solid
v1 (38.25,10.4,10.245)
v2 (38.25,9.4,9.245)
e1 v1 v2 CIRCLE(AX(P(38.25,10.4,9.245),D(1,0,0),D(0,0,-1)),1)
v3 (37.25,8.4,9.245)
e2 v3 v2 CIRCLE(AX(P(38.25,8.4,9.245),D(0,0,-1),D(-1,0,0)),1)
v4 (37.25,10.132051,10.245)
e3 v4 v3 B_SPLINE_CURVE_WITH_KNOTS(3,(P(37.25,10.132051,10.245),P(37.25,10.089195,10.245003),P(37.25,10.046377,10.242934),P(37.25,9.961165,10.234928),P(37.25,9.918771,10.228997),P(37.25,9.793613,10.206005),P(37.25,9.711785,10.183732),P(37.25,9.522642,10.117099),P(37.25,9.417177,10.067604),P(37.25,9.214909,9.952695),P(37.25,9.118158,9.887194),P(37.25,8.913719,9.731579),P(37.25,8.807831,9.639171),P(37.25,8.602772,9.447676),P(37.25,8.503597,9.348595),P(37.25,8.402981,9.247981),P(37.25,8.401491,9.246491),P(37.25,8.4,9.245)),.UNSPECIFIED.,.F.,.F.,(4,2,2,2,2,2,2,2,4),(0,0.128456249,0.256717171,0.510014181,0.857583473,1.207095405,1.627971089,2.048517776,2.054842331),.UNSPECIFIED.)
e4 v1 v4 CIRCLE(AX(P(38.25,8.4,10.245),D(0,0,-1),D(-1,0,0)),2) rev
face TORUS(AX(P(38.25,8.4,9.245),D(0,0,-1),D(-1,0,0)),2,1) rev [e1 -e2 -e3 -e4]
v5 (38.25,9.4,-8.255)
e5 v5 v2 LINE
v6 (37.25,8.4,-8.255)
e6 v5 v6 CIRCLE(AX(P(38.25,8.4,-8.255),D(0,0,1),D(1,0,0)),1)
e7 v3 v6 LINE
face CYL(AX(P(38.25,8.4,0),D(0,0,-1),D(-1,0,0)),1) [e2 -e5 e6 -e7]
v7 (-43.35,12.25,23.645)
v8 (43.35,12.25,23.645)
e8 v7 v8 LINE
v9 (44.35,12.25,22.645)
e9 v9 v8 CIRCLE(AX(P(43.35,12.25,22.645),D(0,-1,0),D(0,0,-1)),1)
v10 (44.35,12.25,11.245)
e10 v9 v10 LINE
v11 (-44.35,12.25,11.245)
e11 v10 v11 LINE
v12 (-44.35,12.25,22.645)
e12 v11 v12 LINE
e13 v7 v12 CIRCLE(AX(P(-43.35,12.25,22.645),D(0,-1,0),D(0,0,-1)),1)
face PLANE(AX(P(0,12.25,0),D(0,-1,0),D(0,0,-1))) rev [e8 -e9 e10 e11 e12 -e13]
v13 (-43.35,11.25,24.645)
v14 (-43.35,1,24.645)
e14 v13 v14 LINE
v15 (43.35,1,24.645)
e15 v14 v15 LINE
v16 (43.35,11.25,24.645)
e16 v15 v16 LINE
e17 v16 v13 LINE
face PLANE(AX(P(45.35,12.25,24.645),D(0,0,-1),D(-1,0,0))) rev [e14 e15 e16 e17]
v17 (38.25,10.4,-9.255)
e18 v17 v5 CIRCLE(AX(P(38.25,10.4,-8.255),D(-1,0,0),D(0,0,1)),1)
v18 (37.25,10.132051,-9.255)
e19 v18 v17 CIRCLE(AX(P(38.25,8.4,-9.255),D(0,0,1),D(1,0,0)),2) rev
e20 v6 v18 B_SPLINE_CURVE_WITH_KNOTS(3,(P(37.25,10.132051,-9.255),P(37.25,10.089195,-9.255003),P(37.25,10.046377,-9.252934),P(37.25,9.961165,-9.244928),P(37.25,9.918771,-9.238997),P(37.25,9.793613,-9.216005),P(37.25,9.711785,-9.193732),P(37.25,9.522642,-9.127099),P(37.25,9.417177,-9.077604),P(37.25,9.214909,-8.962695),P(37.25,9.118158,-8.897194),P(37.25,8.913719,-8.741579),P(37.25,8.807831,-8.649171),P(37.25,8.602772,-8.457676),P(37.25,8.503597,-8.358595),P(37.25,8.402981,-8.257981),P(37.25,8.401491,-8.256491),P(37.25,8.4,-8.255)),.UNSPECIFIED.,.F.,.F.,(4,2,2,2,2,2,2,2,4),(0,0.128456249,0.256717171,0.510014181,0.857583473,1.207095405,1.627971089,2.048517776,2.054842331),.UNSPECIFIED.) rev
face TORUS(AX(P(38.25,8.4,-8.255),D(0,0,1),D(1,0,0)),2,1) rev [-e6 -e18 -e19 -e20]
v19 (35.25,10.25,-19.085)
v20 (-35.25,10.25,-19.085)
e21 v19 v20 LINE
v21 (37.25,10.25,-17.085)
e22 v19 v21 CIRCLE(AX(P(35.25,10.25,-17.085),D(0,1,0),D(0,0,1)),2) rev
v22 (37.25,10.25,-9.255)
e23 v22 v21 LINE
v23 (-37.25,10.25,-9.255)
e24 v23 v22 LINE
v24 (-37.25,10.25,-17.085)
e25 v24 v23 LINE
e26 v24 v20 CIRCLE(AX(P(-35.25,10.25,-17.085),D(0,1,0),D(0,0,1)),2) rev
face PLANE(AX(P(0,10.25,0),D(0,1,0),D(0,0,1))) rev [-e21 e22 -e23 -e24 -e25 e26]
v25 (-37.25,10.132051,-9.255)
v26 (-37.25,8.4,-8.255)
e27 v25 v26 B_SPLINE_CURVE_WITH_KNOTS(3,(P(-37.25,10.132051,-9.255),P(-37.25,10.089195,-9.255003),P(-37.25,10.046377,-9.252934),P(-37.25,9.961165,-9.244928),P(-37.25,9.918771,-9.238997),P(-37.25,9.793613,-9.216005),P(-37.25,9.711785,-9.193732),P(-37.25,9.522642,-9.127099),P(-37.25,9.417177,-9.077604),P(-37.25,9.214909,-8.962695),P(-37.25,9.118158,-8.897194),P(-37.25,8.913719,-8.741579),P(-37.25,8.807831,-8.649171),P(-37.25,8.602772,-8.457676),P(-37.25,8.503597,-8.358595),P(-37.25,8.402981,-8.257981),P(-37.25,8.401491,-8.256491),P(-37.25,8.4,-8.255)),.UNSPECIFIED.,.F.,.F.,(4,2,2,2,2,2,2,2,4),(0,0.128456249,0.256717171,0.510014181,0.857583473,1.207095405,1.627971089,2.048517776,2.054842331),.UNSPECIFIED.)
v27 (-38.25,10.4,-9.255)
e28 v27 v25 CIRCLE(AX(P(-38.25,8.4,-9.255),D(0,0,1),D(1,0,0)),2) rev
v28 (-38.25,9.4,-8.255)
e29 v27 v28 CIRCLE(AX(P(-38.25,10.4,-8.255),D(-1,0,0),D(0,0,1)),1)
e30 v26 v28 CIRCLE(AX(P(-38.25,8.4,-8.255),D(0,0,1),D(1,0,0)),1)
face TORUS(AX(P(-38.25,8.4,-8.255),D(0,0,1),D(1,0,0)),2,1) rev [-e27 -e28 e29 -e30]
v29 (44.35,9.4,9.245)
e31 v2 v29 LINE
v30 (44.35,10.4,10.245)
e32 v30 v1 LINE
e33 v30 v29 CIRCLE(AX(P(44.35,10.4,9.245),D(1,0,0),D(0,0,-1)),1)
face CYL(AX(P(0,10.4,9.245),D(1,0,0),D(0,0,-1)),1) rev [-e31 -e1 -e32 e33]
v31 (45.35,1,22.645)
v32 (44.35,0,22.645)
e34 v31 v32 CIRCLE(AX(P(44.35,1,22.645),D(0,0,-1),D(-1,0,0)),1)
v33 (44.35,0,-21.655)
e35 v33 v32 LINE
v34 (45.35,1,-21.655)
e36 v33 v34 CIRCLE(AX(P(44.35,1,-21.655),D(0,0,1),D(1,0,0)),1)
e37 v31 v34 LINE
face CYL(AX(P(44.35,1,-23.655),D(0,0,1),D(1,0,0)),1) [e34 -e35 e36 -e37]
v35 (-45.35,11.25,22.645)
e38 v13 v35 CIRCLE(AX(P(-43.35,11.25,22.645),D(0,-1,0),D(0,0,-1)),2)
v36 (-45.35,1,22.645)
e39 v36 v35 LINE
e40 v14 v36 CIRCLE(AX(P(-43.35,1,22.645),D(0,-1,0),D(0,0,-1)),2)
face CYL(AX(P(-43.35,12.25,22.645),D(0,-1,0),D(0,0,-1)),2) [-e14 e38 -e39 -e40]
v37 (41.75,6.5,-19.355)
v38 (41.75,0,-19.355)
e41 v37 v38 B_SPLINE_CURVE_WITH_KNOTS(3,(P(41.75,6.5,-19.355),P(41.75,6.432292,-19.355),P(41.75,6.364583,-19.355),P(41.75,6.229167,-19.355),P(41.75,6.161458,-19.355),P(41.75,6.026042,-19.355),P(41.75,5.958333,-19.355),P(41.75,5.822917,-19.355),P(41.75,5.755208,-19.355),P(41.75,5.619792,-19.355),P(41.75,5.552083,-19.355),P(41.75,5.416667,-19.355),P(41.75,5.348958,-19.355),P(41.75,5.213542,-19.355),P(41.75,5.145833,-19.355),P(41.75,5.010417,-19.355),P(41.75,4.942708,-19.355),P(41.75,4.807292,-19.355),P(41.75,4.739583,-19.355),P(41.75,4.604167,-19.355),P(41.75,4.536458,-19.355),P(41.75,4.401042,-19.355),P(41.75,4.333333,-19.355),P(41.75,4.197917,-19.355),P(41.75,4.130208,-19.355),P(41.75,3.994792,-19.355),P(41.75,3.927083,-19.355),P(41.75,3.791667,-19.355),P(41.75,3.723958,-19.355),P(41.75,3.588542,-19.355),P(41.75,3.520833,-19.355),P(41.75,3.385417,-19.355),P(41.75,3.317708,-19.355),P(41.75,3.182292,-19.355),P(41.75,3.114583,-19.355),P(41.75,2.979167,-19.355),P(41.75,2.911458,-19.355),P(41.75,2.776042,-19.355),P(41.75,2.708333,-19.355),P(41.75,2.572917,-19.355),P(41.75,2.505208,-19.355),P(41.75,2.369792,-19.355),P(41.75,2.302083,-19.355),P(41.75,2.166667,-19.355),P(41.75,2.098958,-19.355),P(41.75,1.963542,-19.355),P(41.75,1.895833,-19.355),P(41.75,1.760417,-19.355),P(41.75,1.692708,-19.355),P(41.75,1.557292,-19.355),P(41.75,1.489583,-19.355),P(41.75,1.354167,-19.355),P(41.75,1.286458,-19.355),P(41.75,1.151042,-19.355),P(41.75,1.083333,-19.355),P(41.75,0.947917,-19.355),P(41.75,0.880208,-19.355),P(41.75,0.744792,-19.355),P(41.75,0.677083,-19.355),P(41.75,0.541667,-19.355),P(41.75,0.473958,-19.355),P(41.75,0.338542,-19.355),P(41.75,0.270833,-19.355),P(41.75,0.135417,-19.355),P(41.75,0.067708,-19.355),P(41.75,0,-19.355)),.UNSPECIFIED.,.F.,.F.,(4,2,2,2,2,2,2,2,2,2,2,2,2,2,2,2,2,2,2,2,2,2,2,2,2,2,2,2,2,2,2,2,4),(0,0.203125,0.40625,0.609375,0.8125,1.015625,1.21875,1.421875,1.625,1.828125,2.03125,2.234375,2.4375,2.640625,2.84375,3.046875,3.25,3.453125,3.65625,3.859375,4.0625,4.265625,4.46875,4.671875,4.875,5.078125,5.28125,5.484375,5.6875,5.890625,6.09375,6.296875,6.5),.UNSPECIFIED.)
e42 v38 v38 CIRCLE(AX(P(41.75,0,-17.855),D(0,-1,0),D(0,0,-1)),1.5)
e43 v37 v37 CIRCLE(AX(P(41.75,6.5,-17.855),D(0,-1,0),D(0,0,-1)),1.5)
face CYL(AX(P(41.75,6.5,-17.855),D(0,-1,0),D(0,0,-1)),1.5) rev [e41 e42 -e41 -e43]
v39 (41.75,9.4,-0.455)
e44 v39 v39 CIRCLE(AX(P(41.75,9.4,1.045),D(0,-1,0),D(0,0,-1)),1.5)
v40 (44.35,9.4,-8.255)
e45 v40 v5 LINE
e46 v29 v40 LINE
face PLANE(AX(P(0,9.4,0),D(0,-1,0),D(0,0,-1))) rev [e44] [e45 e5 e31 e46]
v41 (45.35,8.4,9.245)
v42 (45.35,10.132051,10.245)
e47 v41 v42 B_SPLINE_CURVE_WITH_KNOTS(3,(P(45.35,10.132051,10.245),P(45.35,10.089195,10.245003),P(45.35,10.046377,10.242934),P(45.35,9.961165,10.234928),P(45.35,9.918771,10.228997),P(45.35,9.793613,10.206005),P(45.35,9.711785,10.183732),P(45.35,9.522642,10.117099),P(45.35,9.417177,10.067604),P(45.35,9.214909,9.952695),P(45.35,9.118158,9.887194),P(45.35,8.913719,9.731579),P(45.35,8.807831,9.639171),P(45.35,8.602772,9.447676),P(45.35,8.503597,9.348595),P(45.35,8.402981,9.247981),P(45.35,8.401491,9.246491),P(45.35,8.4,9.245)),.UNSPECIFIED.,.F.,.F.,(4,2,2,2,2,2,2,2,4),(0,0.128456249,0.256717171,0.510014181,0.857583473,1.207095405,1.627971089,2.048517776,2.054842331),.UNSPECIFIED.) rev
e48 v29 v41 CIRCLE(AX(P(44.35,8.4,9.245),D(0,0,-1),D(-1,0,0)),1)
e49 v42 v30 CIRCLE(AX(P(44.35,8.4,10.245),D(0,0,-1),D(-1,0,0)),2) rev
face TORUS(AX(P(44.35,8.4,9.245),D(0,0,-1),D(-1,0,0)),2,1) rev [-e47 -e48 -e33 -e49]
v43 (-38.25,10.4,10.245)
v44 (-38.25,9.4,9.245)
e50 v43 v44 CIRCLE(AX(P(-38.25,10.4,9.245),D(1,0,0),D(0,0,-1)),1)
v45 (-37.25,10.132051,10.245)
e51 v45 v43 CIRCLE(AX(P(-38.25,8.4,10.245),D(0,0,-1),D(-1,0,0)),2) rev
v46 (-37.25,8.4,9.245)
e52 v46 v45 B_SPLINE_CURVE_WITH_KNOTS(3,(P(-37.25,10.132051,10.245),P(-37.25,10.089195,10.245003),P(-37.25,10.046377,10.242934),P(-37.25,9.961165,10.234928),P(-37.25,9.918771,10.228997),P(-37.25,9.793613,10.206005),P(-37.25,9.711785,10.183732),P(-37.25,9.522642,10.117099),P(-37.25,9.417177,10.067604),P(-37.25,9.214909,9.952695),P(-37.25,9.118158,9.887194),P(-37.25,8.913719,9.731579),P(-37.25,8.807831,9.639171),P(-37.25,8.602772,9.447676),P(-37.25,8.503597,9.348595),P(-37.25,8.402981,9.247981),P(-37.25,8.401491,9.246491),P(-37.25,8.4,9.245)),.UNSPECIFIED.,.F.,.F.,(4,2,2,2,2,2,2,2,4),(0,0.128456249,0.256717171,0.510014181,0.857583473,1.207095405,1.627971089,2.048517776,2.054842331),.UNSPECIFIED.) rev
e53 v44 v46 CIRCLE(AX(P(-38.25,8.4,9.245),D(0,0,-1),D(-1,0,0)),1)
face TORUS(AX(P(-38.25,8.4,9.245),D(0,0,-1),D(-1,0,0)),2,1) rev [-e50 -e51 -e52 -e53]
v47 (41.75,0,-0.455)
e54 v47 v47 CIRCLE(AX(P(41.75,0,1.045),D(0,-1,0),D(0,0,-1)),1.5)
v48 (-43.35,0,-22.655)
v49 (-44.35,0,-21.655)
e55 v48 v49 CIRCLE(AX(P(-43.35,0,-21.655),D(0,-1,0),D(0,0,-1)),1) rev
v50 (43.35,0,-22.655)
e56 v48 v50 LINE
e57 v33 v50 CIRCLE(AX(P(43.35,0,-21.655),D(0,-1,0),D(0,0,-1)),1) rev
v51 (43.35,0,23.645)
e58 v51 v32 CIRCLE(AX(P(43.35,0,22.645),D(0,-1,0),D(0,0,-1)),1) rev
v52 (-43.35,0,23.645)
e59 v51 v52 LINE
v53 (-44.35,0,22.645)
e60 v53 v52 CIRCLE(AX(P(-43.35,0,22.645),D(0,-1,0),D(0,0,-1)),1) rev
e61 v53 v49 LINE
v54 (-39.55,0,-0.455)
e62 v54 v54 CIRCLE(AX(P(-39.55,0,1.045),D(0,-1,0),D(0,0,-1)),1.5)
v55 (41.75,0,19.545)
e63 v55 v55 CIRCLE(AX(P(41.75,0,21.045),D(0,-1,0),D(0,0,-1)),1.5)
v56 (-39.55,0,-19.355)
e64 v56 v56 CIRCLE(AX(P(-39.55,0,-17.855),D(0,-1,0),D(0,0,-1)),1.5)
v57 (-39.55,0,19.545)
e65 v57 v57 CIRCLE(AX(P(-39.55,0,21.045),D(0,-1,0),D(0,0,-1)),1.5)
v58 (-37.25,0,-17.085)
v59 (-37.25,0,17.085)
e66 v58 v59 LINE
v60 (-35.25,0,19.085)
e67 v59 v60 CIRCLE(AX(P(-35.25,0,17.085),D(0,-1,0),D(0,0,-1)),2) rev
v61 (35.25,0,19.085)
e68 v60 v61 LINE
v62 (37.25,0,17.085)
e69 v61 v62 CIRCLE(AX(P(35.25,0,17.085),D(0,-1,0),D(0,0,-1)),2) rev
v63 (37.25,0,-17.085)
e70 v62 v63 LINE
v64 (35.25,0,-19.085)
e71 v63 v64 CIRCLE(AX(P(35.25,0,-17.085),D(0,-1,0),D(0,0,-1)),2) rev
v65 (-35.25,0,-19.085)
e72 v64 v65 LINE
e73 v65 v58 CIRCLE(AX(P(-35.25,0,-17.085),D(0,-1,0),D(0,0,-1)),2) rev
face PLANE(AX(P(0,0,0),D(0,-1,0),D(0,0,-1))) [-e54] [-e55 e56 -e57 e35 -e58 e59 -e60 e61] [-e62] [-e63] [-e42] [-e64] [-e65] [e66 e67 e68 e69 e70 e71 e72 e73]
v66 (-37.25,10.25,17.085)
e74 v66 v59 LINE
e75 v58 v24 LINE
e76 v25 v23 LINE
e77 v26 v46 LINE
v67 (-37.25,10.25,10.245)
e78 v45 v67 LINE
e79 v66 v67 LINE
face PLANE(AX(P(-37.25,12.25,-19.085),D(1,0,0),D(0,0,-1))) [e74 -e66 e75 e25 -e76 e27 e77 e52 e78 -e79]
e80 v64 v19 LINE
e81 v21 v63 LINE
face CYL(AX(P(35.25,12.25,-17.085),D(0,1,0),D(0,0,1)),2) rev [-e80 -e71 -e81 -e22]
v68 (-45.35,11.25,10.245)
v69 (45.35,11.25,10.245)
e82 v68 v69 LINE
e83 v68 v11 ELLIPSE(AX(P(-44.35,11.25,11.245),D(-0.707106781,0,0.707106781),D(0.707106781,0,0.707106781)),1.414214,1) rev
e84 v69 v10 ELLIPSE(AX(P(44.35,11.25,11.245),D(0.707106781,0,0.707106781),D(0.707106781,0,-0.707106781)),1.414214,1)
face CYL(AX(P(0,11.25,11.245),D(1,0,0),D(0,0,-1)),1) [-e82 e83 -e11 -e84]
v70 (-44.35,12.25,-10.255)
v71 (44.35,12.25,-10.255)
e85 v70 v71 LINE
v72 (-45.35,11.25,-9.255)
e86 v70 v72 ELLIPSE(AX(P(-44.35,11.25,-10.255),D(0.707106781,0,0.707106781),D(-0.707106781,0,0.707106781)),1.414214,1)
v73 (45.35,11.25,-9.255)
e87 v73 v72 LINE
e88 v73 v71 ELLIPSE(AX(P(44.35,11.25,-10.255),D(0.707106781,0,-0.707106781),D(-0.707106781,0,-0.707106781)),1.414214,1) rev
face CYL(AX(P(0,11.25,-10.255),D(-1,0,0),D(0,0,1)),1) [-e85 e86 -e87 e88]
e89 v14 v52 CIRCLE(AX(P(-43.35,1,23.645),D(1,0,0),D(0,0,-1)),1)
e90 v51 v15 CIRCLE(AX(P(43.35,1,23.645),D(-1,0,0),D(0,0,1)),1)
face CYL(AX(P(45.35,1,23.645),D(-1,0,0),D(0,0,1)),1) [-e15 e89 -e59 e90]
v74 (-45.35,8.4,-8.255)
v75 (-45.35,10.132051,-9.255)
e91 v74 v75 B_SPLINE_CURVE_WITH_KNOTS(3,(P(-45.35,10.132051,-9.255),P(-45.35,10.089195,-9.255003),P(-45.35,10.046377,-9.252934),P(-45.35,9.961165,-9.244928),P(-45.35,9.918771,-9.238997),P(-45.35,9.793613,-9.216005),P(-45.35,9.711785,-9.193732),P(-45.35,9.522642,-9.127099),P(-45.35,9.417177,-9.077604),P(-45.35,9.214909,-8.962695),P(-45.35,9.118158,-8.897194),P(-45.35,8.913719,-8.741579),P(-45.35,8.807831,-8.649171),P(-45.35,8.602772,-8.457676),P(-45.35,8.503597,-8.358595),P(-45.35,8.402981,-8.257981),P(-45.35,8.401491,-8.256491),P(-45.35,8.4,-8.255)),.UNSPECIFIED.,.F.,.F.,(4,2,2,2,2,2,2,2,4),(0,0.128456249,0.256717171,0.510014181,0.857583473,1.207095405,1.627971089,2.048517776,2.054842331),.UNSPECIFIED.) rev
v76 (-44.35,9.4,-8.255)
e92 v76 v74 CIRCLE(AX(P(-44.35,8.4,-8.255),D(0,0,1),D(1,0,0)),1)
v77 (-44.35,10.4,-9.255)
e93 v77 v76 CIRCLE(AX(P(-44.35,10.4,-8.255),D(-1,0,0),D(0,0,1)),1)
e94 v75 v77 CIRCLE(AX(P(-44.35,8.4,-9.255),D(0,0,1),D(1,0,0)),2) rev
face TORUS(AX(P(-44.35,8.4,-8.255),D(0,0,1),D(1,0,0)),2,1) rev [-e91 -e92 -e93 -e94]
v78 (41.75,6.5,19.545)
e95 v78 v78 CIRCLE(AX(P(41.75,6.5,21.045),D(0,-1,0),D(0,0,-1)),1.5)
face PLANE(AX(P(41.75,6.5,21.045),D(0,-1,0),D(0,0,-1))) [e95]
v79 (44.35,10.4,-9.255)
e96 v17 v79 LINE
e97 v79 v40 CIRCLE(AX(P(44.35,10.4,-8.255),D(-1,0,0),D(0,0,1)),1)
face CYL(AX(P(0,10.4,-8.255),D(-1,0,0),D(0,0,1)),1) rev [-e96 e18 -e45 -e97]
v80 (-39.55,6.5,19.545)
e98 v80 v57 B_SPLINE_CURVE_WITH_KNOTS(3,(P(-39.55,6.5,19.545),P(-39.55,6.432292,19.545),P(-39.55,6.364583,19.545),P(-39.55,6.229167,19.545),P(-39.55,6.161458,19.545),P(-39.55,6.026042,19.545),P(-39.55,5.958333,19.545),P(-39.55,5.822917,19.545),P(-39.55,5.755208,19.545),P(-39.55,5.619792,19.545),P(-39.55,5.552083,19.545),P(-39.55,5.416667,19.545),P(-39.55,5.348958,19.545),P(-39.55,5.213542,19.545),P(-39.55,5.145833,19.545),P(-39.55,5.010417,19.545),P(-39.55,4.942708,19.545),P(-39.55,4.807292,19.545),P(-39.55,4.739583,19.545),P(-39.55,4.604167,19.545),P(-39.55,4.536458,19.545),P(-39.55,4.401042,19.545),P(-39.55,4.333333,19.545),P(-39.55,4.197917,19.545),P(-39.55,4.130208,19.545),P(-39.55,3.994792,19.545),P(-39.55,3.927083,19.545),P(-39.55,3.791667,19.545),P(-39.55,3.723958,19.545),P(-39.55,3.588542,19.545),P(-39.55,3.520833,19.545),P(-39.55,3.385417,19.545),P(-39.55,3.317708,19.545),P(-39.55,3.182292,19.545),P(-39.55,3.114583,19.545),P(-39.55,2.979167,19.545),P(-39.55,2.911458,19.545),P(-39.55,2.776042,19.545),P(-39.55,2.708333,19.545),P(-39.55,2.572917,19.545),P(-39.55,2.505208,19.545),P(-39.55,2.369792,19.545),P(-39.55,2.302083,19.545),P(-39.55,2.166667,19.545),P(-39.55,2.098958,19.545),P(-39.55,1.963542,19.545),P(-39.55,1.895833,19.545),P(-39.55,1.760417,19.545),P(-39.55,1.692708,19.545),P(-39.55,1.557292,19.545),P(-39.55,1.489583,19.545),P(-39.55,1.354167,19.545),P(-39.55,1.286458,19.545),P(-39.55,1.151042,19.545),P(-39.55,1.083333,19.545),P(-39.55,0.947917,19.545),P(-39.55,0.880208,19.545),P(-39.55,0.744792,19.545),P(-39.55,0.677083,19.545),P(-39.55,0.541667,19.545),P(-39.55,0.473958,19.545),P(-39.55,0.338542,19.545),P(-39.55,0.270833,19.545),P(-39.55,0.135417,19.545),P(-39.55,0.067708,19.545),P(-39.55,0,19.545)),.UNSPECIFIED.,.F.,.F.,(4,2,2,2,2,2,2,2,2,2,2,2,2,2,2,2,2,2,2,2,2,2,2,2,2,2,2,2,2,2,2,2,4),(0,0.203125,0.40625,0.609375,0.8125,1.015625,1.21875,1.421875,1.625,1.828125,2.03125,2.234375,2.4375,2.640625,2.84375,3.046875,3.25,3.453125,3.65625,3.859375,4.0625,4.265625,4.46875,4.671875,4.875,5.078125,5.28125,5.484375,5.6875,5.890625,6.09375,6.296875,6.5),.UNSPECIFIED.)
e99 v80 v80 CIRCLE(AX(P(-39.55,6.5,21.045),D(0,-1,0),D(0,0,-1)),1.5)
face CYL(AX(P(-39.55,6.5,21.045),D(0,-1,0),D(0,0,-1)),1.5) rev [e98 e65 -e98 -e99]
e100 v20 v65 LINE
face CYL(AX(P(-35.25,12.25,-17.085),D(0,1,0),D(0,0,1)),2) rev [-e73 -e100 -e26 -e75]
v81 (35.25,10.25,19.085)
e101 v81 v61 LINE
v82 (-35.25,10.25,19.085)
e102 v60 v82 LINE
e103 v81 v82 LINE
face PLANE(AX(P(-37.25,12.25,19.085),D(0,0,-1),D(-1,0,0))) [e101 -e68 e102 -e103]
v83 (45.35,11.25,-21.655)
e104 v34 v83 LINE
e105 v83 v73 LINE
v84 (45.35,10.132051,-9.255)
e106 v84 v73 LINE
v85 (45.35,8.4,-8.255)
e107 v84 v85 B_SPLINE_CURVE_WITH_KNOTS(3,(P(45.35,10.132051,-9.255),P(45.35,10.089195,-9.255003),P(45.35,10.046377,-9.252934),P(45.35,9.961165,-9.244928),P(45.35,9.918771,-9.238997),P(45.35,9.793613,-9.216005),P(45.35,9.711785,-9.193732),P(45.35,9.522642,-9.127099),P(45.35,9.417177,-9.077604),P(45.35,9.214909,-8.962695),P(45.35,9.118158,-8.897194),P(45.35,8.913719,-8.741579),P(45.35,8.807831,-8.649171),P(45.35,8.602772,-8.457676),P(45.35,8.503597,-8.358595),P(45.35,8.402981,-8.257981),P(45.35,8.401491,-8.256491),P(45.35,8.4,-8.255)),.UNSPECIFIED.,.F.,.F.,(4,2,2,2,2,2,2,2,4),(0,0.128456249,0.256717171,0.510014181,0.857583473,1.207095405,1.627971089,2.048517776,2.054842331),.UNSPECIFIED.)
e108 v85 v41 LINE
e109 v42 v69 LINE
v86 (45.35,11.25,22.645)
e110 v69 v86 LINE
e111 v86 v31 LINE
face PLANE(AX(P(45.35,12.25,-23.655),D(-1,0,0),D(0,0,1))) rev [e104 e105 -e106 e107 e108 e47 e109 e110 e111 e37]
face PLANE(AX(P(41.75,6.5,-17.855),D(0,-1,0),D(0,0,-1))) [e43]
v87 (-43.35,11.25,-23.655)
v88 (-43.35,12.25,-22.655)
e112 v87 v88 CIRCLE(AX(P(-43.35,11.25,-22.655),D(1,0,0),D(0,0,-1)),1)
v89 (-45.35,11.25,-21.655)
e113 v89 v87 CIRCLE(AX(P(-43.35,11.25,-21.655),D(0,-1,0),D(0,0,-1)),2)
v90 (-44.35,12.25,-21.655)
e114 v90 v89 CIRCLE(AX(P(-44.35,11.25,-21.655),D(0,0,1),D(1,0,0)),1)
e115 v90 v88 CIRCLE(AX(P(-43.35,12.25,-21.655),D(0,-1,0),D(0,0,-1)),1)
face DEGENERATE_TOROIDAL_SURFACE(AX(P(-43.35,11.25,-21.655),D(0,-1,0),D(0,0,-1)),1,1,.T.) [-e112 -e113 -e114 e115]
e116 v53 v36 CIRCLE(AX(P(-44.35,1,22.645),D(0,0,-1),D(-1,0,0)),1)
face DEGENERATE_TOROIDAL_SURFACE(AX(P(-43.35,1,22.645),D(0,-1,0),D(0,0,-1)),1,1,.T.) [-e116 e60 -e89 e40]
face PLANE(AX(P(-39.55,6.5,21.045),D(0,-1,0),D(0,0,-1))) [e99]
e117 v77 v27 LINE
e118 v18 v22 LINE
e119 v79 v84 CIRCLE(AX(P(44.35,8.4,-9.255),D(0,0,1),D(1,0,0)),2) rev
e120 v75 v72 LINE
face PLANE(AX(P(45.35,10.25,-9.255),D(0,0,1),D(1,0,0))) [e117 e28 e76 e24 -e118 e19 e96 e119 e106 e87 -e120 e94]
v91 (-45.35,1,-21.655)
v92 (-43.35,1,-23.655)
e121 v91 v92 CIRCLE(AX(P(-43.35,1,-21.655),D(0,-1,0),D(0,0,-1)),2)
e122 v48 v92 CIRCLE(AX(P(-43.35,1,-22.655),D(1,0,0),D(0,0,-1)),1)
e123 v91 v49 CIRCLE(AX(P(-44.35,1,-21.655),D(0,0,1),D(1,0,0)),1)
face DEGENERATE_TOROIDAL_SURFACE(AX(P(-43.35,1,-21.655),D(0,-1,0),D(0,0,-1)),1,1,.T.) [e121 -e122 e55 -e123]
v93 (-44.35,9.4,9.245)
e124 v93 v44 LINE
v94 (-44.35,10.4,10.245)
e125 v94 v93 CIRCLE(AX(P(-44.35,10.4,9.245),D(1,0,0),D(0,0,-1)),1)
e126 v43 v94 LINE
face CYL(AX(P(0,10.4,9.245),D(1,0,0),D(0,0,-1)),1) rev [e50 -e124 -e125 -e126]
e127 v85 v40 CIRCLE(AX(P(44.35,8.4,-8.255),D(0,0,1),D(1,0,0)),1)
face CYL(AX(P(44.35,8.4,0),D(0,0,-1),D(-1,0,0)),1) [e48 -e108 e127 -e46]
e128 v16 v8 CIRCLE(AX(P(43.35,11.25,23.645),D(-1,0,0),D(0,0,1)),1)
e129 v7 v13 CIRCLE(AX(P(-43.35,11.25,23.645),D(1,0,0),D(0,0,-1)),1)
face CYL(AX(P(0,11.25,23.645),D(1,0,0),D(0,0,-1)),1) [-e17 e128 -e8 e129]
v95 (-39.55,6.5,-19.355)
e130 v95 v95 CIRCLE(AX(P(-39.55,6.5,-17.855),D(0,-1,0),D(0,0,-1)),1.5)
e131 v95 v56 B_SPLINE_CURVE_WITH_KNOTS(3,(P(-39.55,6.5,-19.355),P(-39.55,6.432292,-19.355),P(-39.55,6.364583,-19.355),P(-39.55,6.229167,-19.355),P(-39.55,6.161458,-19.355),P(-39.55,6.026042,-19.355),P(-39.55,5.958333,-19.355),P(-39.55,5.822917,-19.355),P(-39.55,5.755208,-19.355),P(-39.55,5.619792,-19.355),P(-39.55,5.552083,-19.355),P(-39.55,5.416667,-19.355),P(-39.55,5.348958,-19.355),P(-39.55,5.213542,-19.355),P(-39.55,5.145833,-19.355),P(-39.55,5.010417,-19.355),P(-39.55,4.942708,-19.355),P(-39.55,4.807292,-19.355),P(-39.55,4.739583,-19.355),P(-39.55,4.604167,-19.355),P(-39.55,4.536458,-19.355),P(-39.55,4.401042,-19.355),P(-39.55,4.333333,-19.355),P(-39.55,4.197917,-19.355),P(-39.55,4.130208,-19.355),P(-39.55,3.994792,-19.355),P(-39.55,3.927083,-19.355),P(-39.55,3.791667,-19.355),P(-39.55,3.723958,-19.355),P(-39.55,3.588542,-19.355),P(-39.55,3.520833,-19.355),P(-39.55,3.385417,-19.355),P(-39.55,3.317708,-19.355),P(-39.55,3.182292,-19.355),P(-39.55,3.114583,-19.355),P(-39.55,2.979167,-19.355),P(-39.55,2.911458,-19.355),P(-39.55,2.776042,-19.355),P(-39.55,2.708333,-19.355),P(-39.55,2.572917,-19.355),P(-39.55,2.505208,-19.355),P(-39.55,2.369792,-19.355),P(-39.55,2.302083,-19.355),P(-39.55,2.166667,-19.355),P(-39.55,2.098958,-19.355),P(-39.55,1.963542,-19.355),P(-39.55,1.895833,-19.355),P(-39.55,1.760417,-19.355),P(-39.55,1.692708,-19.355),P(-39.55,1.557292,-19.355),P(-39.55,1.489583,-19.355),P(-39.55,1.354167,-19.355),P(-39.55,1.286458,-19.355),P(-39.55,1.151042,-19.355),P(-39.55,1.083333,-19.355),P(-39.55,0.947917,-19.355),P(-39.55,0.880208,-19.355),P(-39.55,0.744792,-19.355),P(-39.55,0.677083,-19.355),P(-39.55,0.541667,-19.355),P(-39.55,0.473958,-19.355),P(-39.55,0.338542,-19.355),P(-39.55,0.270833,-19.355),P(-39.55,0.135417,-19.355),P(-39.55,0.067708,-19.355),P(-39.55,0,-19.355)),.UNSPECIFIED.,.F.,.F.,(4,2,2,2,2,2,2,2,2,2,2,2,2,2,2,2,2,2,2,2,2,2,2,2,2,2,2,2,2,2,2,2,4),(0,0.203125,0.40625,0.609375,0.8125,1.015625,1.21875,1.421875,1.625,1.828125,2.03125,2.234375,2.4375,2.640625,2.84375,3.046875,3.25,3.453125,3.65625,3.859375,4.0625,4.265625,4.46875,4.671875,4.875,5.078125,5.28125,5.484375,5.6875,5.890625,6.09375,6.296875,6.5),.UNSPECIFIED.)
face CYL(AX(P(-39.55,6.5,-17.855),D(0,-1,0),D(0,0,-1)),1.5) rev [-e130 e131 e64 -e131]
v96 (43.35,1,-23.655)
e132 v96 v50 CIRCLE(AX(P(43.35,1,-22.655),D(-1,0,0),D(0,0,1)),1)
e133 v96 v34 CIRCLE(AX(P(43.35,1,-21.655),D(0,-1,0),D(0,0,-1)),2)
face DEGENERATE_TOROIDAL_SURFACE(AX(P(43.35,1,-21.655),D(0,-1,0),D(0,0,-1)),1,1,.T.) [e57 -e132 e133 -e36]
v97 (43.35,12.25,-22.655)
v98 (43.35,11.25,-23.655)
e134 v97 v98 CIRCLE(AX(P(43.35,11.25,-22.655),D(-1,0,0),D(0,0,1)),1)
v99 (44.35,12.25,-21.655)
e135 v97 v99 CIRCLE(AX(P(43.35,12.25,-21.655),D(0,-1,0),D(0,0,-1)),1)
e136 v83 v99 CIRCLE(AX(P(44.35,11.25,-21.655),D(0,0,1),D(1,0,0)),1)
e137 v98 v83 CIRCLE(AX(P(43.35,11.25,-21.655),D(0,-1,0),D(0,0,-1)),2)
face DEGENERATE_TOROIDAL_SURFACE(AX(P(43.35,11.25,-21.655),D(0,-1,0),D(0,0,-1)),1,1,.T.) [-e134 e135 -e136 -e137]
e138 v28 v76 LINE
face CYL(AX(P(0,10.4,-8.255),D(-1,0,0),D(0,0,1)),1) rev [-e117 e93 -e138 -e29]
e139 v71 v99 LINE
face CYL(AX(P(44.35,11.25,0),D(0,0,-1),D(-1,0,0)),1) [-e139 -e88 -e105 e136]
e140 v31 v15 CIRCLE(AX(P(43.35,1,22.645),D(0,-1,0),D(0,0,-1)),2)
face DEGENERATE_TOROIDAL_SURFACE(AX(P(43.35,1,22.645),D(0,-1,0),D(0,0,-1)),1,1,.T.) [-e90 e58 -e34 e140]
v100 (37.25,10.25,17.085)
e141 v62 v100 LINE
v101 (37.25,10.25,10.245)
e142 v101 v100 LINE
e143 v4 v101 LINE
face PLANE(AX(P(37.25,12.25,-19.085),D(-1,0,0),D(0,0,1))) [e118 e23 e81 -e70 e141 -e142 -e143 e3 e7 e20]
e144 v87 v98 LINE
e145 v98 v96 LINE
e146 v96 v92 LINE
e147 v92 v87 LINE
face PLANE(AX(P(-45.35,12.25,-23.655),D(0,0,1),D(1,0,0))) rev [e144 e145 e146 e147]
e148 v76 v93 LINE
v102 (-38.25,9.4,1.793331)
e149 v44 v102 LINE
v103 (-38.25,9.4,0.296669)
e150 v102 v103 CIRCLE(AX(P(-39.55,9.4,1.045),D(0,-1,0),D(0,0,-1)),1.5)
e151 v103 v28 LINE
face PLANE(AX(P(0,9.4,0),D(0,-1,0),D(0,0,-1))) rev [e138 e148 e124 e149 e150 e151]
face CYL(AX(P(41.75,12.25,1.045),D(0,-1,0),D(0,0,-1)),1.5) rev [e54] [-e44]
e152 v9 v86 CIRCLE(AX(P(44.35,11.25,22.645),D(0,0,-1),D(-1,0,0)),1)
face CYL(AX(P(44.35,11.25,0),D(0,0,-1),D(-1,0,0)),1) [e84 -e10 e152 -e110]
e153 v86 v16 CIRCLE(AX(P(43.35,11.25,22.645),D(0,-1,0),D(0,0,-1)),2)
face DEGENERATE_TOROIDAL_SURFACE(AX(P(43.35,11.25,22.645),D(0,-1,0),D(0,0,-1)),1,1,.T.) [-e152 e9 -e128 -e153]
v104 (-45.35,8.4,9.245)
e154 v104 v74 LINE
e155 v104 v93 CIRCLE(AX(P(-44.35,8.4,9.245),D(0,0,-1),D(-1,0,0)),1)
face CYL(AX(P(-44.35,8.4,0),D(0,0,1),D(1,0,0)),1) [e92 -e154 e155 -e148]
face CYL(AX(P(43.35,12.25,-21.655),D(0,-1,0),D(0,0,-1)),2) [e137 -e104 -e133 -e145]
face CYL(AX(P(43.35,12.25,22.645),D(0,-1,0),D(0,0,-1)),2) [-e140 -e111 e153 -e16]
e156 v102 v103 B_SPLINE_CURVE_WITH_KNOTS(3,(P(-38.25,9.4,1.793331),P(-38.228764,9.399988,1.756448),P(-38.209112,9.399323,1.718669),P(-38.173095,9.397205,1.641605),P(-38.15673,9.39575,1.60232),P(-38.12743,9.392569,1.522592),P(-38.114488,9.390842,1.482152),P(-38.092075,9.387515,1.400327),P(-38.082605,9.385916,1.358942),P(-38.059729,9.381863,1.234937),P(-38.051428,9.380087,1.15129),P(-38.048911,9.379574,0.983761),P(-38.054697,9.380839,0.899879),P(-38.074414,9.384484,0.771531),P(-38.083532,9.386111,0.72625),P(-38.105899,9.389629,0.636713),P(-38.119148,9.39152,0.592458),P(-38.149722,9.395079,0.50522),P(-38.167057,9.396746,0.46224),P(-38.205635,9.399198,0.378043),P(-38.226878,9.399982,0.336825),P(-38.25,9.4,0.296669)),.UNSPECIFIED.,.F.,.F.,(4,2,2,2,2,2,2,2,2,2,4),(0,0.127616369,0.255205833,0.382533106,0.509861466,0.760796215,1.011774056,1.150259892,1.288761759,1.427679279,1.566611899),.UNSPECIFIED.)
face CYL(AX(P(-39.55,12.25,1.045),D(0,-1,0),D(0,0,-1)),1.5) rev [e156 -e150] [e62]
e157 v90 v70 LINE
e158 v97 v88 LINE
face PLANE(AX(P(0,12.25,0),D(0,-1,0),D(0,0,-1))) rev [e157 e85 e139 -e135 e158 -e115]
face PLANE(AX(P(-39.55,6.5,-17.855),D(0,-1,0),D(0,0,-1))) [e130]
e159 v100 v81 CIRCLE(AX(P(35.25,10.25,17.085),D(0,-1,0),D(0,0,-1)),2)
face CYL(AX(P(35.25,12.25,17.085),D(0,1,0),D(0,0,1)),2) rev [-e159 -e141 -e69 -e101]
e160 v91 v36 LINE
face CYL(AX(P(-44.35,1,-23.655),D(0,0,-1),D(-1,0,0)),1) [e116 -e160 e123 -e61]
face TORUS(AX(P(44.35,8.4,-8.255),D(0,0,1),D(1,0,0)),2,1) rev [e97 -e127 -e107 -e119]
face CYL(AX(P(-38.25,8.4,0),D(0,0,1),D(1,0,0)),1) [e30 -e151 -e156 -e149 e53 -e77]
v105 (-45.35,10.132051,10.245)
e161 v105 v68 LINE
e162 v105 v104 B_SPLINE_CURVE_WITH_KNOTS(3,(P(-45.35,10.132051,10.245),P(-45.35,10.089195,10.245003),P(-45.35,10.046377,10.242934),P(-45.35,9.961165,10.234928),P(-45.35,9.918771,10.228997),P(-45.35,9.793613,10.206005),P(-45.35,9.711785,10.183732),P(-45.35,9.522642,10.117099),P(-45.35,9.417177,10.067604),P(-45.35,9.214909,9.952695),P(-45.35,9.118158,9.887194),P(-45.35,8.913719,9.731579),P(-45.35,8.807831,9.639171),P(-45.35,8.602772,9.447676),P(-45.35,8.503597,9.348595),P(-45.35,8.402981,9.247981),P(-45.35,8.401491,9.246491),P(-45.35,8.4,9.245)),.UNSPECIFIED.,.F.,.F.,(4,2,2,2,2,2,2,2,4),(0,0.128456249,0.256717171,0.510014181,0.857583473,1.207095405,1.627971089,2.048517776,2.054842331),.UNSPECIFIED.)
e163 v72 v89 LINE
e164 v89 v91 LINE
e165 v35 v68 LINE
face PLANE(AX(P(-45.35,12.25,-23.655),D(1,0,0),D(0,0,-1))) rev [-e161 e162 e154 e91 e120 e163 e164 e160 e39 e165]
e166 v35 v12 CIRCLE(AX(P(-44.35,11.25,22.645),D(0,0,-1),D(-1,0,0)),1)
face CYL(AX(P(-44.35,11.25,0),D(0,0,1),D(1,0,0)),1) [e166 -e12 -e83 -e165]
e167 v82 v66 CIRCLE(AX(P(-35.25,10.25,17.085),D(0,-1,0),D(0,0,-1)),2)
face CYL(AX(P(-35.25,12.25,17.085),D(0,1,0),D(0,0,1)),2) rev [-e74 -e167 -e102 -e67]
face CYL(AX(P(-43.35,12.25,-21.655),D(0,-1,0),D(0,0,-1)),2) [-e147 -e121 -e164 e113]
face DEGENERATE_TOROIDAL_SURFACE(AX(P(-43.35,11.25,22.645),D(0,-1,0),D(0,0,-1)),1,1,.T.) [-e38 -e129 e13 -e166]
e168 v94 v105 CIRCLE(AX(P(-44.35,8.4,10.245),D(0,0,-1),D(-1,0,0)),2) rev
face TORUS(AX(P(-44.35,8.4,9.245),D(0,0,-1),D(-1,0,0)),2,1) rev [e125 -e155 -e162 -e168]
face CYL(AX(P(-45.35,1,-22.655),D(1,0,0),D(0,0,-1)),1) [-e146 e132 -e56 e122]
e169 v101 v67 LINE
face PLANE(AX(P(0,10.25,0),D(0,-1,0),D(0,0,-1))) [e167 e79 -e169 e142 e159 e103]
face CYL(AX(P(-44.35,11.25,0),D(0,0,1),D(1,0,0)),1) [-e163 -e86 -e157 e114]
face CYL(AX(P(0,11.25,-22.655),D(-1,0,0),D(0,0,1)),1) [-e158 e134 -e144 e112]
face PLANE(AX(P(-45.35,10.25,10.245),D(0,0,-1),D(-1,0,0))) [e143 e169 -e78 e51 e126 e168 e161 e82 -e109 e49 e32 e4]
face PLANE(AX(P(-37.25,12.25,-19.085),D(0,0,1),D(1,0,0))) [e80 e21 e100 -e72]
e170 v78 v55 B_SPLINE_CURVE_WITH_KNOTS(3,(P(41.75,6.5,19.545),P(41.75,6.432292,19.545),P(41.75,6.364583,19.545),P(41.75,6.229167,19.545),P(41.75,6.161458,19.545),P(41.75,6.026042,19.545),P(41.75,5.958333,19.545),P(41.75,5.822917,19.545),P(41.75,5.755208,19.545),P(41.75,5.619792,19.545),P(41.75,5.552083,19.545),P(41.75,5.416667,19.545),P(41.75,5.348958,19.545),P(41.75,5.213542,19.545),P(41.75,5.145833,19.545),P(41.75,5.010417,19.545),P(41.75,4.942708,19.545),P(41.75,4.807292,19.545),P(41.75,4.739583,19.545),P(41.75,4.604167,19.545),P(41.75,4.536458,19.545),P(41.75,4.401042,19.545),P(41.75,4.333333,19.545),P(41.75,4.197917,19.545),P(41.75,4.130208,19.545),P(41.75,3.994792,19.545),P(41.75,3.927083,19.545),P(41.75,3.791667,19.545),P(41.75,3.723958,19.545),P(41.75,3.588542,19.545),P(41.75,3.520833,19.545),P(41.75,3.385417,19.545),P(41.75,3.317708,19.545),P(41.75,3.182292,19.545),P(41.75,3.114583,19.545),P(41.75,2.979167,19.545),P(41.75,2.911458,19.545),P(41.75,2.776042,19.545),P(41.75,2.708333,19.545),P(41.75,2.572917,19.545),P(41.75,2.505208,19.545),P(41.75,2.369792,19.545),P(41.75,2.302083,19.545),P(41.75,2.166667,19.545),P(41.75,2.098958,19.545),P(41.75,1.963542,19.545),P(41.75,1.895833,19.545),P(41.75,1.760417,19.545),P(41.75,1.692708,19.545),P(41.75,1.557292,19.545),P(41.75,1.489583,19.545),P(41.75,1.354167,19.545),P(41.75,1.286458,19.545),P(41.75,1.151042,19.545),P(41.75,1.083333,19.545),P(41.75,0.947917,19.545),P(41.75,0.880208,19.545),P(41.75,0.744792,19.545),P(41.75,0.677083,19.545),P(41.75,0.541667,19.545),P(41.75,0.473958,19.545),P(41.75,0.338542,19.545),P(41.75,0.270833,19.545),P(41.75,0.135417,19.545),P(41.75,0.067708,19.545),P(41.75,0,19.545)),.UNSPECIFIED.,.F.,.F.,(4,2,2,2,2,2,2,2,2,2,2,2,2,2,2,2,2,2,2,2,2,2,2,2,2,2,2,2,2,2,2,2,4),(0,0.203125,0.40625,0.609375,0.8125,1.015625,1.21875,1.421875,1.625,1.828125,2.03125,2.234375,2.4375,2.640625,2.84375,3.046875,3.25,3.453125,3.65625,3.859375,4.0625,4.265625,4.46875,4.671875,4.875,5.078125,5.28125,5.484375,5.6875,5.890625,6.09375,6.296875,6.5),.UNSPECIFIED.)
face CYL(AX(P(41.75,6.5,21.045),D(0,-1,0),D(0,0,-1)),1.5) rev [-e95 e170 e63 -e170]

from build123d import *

# Parameters (mm, degrees)
SKETCH1_W           = 90.7
SKETCH1_H           = 48.3
SKETCH1_W_2         = 74.5
SKETCH1_H_2         = 38.17
BOSS_EXTRUDE1_DEPTH = 12.25
SKETCH2_W           = 90.7
SKETCH2_H           = 14.4
BOSS_EXTRUDE2_DEPTH = 2
SKETCH3_W           = 8.1
SKETCH3_H           = 19.5
CUT_EXTRUDE1_DEPTH  = 2.85
SKETCH4_R           = 1.5
CUT_EXTRUDE2_DEPTH  = 6.5
SKETCH5_R           = 1.5
CUT_EXTRUDE3_DEPTH  = 54.047724032
FILLET7_R           = 1
FILLET4_R           = 2
FILLET5_R           = 1
FILLET8_R           = 1


with BuildPart() as part:
    # Sketch1 → Boss-Extrude1 (new body)
    with BuildSketch(Plane(origin=(0, 0, 0), x_dir=(1, 0, 0), z_dir=(0, 1, 0))):
        with Locations((0, -0.495)):
            Rectangle(SKETCH1_W, SKETCH1_H)
        Rectangle(SKETCH1_W_2, SKETCH1_H_2, mode=Mode.SUBTRACT)
    extrude(amount=BOSS_EXTRUDE1_DEPTH)

    # Sketch2 → Boss-Extrude2 (add)
    with BuildSketch(Plane(origin=(0, 12.25, 0), x_dir=(1, 0, 0), z_dir=(0, 1, 0))):
        with Locations((0, 16.455)):
            Rectangle(SKETCH2_W, SKETCH2_H)
        with Locations((0, -17.445)):
            Rectangle(SKETCH2_W, SKETCH2_H)
    extrude(amount=-BOSS_EXTRUDE2_DEPTH)

    # Sketch3 → Cut-Extrude1 (cut)
    with BuildSketch(Plane(origin=(0, 12.25, 0), x_dir=(1, 0, 0), z_dir=(0, 1, 0))):
        with Locations((-41.3, -0.495)):
            Rectangle(SKETCH3_W, SKETCH3_H)
        with Locations((41.3, -0.495)):
            Rectangle(SKETCH3_W, SKETCH3_H)
    extrude(amount=-CUT_EXTRUDE1_DEPTH, mode=Mode.SUBTRACT)

    # Sketch4 → Cut-Extrude2 (cut)
    with BuildSketch(Plane.XZ):
        with Locations(Location((-39.55, 21.045, 0), (0, 0, 270))):
            Circle(SKETCH4_R)
        with Locations(Location((41.75, 21.045, 0), (0, 0, 270))):
            Circle(SKETCH4_R)
        with Locations(Location((41.75, -17.855, 0), (0, 0, 270))):
            Circle(SKETCH4_R)
        with Locations(Location((-39.55, -17.855, 0), (0, 0, 270))):
            Circle(SKETCH4_R)
    extrude(amount=-CUT_EXTRUDE2_DEPTH, mode=Mode.SUBTRACT)

    # Sketch5 → Cut-Extrude3 (cut, through all)
    with BuildSketch(Plane.XZ):
        with Locations(Location((-39.55, 1.045, 0), (0, 0, 270))):
            Circle(SKETCH5_R)
        with Locations(Location((41.75, 1.045, 0), (0, 0, 270))):
            Circle(SKETCH5_R)
    extrude(amount=-CUT_EXTRUDE3_DEPTH, mode=Mode.SUBTRACT)

    # Fillet7
    fillet7_edges = [part.edges().sort_by_distance(p)[0] for p in [
        (45.35, 12.25, 17.445),
        (0, 12.25, -23.655),
        (-45.35, 12.25, -16.455),
        (0, 0, -23.655),
        (0, 12.25, -9.255),
        (45.35, 0, 0.495),
        (0, 0, 24.645),
        (0, 12.25, 10.245),
        (-45.35, 0, 0.495),
        (45.35, 12.25, -16.455),
        (-45.35, 12.25, 17.445),
        (0, 12.25, 24.645),
    ]]
    fillet(fillet7_edges, radius=FILLET7_R)

    # Fillet4
    # the kernel refuses this fillet: 2 mm, written as the material it adds along each edge
    with BuildSketch(Plane(origin=(-37.25, 0, 19.085), x_dir=(0, 0, -1), z_dir=(0, 1, 0)), Plane(origin=(37.25, 0, -19.085), x_dir=(0, 0, 1), z_dir=(0, 1, 0))) as fillet4_piece_1:
        with BuildLine():
            CenterArc((FILLET4_R, -FILLET4_R), FILLET4_R, 90, 90)
            Line((0, -FILLET4_R), (0, 0))
            Line((0, 0), (FILLET4_R, 0))
        make_face()
    extrude(amount=10.25)
    with BuildSketch(Plane(origin=(37.25, 0, 19.085), x_dir=(0, 0, -1), z_dir=(0, 1, 0)), Plane(origin=(-37.25, 0, -19.085), x_dir=(0, 0, 1), z_dir=(0, 1, 0))) as fillet4_piece_2:
        with BuildLine():
            CenterArc((FILLET4_R, FILLET4_R), FILLET4_R, 180, 90)
            Line((0, FILLET4_R), (0, 0))
            Line((0, 0), (FILLET4_R, 0))
        make_face()
    extrude(amount=10.25)
    # the kernel refuses this fillet: 2 mm, written as the material it takes off along each edge
    with BuildSketch(Plane(origin=(-43.35, 12.25, 22.645), x_dir=(-1, 0, 0), z_dir=(0, 0, -1))) as fillet4_2_piece_1:
        with BuildLine():
            CenterArc((1, -1), 1, 0, 90)
            Line((2, -1), (2, 0))
            Line((2, 0), (1, 0))
        make_face()
    revolve(axis=Axis((-43.35, 12.25, 22.645), (0, 1, 0)), revolution_arc=90, mode=Mode.SUBTRACT)
    with BuildSketch(Plane(origin=(43.35, 12.25, 22.645), x_dir=(0, 0, 1), z_dir=(-1, 0, 0))) as fillet4_2_piece_2:
        with BuildLine():
            CenterArc((1, -1), 1, 0, 90)
            Line((2, -1), (2, 0))
            Line((2, 0), (1, 0))
        make_face()
    revolve(axis=Axis((43.35, 12.25, 22.645), (0, 1, 0)), revolution_arc=90, mode=Mode.SUBTRACT)
    with BuildSketch(Plane(origin=(-43.35, 12.25, -21.655), x_dir=(0, 0, -1), z_dir=(1, 0, 0))) as fillet4_2_piece_3:
        with BuildLine():
            CenterArc((1, -1), 1, 0, 90)
            Line((2, -1), (2, 0))
            Line((2, 0), (1, 0))
        make_face()
    revolve(axis=Axis((-43.35, 12.25, -21.655), (0, 1, 0)), revolution_arc=90, mode=Mode.SUBTRACT)
    with BuildSketch(Plane(origin=(43.35, 12.25, -21.655), x_dir=(1, 0, 0), z_dir=(0, 0, 1))) as fillet4_2_piece_4:
        with BuildLine():
            CenterArc((1, -1), 1, 0, 90)
            Line((2, -1), (2, 0))
            Line((2, 0), (1, 0))
        make_face()
    revolve(axis=Axis((43.35, 12.25, -21.655), (0, 1, 0)), revolution_arc=90, mode=Mode.SUBTRACT)
    with BuildSketch(Plane(origin=(-43.35, 0, -21.655), x_dir=(-1, 0, 0), z_dir=(0, 0, 1))) as fillet4_2_piece_5:
        with BuildLine():
            CenterArc((1, -1), 1, 0, 90)
            Line((2, -1), (2, 0))
            Line((2, 0), (1, 0))
        make_face()
    revolve(axis=Axis((-43.35, 0, -21.655), (0, -1, 0)), revolution_arc=90, mode=Mode.SUBTRACT)
    with BuildSketch(Plane(origin=(43.35, 0, -21.655), x_dir=(0, 0, -1), z_dir=(-1, 0, 0))) as fillet4_2_piece_6:
        with BuildLine():
            CenterArc((1, -1), 1, 0, 90)
            Line((2, -1), (2, 0))
            Line((2, 0), (1, 0))
        make_face()
    revolve(axis=Axis((43.35, 0, -21.655), (0, -1, 0)), revolution_arc=90, mode=Mode.SUBTRACT)
    with BuildSketch(Plane(origin=(-43.35, 0, 22.645), x_dir=(0, 0, 1), z_dir=(1, 0, 0))) as fillet4_2_piece_7:
        with BuildLine():
            CenterArc((1, -1), 1, 0, 90)
            Line((2, -1), (2, 0))
            Line((2, 0), (1, 0))
        make_face()
    revolve(axis=Axis((-43.35, 0, 22.645), (0, -1, 0)), revolution_arc=90, mode=Mode.SUBTRACT)
    with BuildSketch(Plane(origin=(43.35, 0, 22.645), x_dir=(1, 0, 0), z_dir=(0, 0, -1))) as fillet4_2_piece_8:
        with BuildLine():
            CenterArc((1, -1), 1, 0, 90)
            Line((2, -1), (2, 0))
            Line((2, 0), (1, 0))
        make_face()
    revolve(axis=Axis((43.35, 0, 22.645), (0, -1, 0)), revolution_arc=90, mode=Mode.SUBTRACT)
    with BuildSketch(Plane(origin=(45.35, 12.25, 24.645), x_dir=(0, 0, -1), z_dir=(0, -1, 0)), Plane(origin=(45.35, 12.25, -23.655), x_dir=(-1, 0, 0), z_dir=(0, -1, 0)), Plane(origin=(-45.35, 0, 24.645), x_dir=(0, 0, -1), z_dir=(0, 1, 0)), Plane(origin=(-45.35, 0, -23.655), x_dir=(1, 0, 0), z_dir=(0, 1, 0))) as fillet4_2_piece_9:
        with BuildLine():
            CenterArc((FILLET4_R, -FILLET4_R), FILLET4_R, 90, 90)
            Line((0, -FILLET4_R), (0, 0))
            Line((0, 0), (FILLET4_R, 0))
        make_face()
    extrude(amount=12.25, mode=Mode.SUBTRACT)

    # Fillet5
    # the kernel refuses this fillet: 1 mm, written as the material it takes off along each edge
    with BuildSketch(Plane(origin=(-45.35, 9.4, -9.255), x_dir=(0, -1, 0), z_dir=(0, 0, 1)), Plane(origin=(-37.25, 9.4, 10.245), x_dir=(0, -1, 0), z_dir=(0, 0, -1)), Plane(origin=(37.25, 9.4, -9.255), x_dir=(0, -1, 0), z_dir=(0, 0, 1))) as fillet5_piece_1:
        with BuildLine():
            CenterArc((FILLET5_R, FILLET5_R), FILLET5_R, 180, 90)
            Line((0, FILLET5_R), (0, 0))
            Line((0, 0), (FILLET5_R, 0))
        make_face()
    extrude(amount=19.5, mode=Mode.SUBTRACT)
    with BuildSketch(Plane(origin=(45.35, 9.4, 10.245), x_dir=(-1, 0, 0), z_dir=(0, 0, -1))) as fillet5_piece_2:
        with BuildLine():
            CenterArc((FILLET5_R, -FILLET5_R), FILLET5_R, 90, 90)
            Line((0, -FILLET5_R), (0, 0))
            Line((0, 0), (FILLET5_R, 0))
        make_face()
    extrude(amount=19.5, mode=Mode.SUBTRACT)

    # Fillet8
    # the kernel refuses this fillet: 1 mm, written as the material it adds along each edge
    with BuildSketch(Plane(origin=(44.35, 9.4, -9.255), x_dir=(0, 1, 0), z_dir=(-1, 0, 0)), Plane(origin=(38.25, 9.4, 10.245), x_dir=(0, 1, 0), z_dir=(1, 0, 0)), Plane(origin=(-44.35, 9.4, 10.245), x_dir=(0, 1, 0), z_dir=(1, 0, 0)), Plane(origin=(-38.25, 9.4, -9.255), x_dir=(0, 1, 0), z_dir=(-1, 0, 0))) as fillet8_piece_1:
        with BuildLine():
            CenterArc((FILLET8_R, -FILLET8_R), FILLET8_R, 90, 90)
            Line((0, -FILLET8_R), (0, 0))
            Line((0, 0), (FILLET8_R, 0))
        make_face()
    extrude(amount=6.1)
    with BuildSketch(Plane(origin=(44.35, 8.4, -9.255), x_dir=(0, 1, 0), z_dir=(-1, 0, 0))) as fillet8_piece_2_section:
        with BuildLine():
            CenterArc((1 + FILLET8_R, -FILLET8_R), FILLET8_R, 90, 90)
            Line((1, -FILLET8_R), (1, 0))
            Line((1, 0), (1 + FILLET8_R, 0))
        make_face()
    fillet8_piece_2 = revolve(axis=Axis((44.35, 8.4, -9.255), (0, 0, -1)), revolution_arc=233.296989237, mode=Mode.PRIVATE)
    fillet8_piece_2 = split(fillet8_piece_2, bisect_by=Plane(origin=(45.35, 9.619775247, -9.087699795), z_dir=(-1, 0, 0)), keep=Keep.TOP, mode=Mode.PRIVATE)
    add(fillet8_piece_2)
    with BuildSketch(Plane(origin=(44.35, 8.4, 10.245), x_dir=(0, 1, 0), z_dir=(-1, 0, 0))) as fillet8_piece_3_section:
        with BuildLine():
            CenterArc((1 + FILLET8_R, FILLET8_R), FILLET8_R, 180, 90)
            Line((1, FILLET8_R), (1, 0))
            Line((1, 0), (1 + FILLET8_R, 0))
        make_face()
    fillet8_piece_3 = revolve(axis=Axis((44.35, 8.4, 10.245), (0, 0, -1)), revolution_arc=233.296989237, mode=Mode.PRIVATE)
    fillet8_piece_3 = split(fillet8_piece_3, bisect_by=Plane(origin=(45.35, 9.619775247, 10.077699795), z_dir=(-1, 0, 0)), keep=Keep.TOP, mode=Mode.PRIVATE)
    add(fillet8_piece_3)
    with BuildSketch(Plane(origin=(38.25, 8.4, 10.245), x_dir=(0, 1, 0), z_dir=(1, 0, 0))) as fillet8_piece_4_section:
        with BuildLine():
            CenterArc((1 + FILLET8_R, -FILLET8_R), FILLET8_R, 90, 90)
            Line((1, -FILLET8_R), (1, 0))
            Line((1, 0), (1 + FILLET8_R, 0))
        make_face()
    fillet8_piece_4 = revolve(axis=Axis((38.25, 8.4, 10.245), (0, 0, 1)), revolution_arc=233.296989237, mode=Mode.PRIVATE)
    fillet8_piece_4 = split(fillet8_piece_4, bisect_by=Plane(origin=(37.25, 9.619775248, 10.077699795), z_dir=(1, 0, 0)), keep=Keep.TOP, mode=Mode.PRIVATE)
    add(fillet8_piece_4)
    with BuildSketch(Plane(origin=(38.25, 8.4, -9.255), x_dir=(0, 1, 0), z_dir=(1, 0, 0))) as fillet8_piece_5_section:
        with BuildLine():
            CenterArc((1 + FILLET8_R, FILLET8_R), FILLET8_R, 180, 90)
            Line((1, FILLET8_R), (1, 0))
            Line((1, 0), (1 + FILLET8_R, 0))
        make_face()
    fillet8_piece_5 = revolve(axis=Axis((38.25, 8.4, -9.255), (0, 0, 1)), revolution_arc=233.296989237, mode=Mode.PRIVATE)
    fillet8_piece_5 = split(fillet8_piece_5, bisect_by=Plane(origin=(37.25, 9.619775248, -9.087699795), z_dir=(1, 0, 0)), keep=Keep.TOP, mode=Mode.PRIVATE)
    add(fillet8_piece_5)
    with BuildSketch(Plane(origin=(-38.25, 8.4, -9.255), x_dir=(0, 1, 0), z_dir=(-1, 0, 0))) as fillet8_piece_6_section:
        with BuildLine():
            CenterArc((1 + FILLET8_R, -FILLET8_R), FILLET8_R, 90, 90)
            Line((1, -FILLET8_R), (1, 0))
            Line((1, 0), (1 + FILLET8_R, 0))
        make_face()
    fillet8_piece_6 = revolve(axis=Axis((-38.25, 8.4, -9.255), (0, 0, -1)), revolution_arc=233.296989237, mode=Mode.PRIVATE)
    fillet8_piece_6 = split(fillet8_piece_6, bisect_by=Plane(origin=(-37.25, 9.619775247, -9.087699795), z_dir=(-1, 0, 0)), keep=Keep.TOP, mode=Mode.PRIVATE)
    add(fillet8_piece_6)
    with BuildSketch(Plane(origin=(-38.25, 8.4, 10.245), x_dir=(0, 1, 0), z_dir=(-1, 0, 0))) as fillet8_piece_7_section:
        with BuildLine():
            CenterArc((1 + FILLET8_R, FILLET8_R), FILLET8_R, 180, 90)
            Line((1, FILLET8_R), (1, 0))
            Line((1, 0), (1 + FILLET8_R, 0))
        make_face()
    fillet8_piece_7 = revolve(axis=Axis((-38.25, 8.4, 10.245), (0, 0, -1)), revolution_arc=233.296989237, mode=Mode.PRIVATE)
    fillet8_piece_7 = split(fillet8_piece_7, bisect_by=Plane(origin=(-37.25, 9.619775247, 10.077699795), z_dir=(-1, 0, 0)), keep=Keep.TOP, mode=Mode.PRIVATE)
    add(fillet8_piece_7)
    with BuildSketch(Plane(origin=(-44.35, 8.4, 10.245), x_dir=(0, 1, 0), z_dir=(1, 0, 0))) as fillet8_piece_8_section:
        with BuildLine():
            CenterArc((1 + FILLET8_R, -FILLET8_R), FILLET8_R, 90, 90)
            Line((1, -FILLET8_R), (1, 0))
            Line((1, 0), (1 + FILLET8_R, 0))
        make_face()
    fillet8_piece_8 = revolve(axis=Axis((-44.35, 8.4, 10.245), (0, 0, 1)), revolution_arc=233.296989237, mode=Mode.PRIVATE)
    fillet8_piece_8 = split(fillet8_piece_8, bisect_by=Plane(origin=(-45.35, 9.619775248, 10.077699795), z_dir=(1, 0, 0)), keep=Keep.TOP, mode=Mode.PRIVATE)
    add(fillet8_piece_8)
    with BuildSketch(Plane(origin=(-44.35, 8.4, -9.255), x_dir=(0, 1, 0), z_dir=(1, 0, 0))) as fillet8_piece_9_section:
        with BuildLine():
            CenterArc((1 + FILLET8_R, FILLET8_R), FILLET8_R, 180, 90)
            Line((1, FILLET8_R), (1, 0))
            Line((1, 0), (1 + FILLET8_R, 0))
        make_face()
    fillet8_piece_9 = revolve(axis=Axis((-44.35, 8.4, -9.255), (0, 0, 1)), revolution_arc=233.296989237, mode=Mode.PRIVATE)
    fillet8_piece_9 = split(fillet8_piece_9, bisect_by=Plane(origin=(-45.35, 9.619775248, -9.087699795), z_dir=(1, 0, 0)), keep=Keep.TOP, mode=Mode.PRIVATE)
    add(fillet8_piece_9)


solid = part.part
